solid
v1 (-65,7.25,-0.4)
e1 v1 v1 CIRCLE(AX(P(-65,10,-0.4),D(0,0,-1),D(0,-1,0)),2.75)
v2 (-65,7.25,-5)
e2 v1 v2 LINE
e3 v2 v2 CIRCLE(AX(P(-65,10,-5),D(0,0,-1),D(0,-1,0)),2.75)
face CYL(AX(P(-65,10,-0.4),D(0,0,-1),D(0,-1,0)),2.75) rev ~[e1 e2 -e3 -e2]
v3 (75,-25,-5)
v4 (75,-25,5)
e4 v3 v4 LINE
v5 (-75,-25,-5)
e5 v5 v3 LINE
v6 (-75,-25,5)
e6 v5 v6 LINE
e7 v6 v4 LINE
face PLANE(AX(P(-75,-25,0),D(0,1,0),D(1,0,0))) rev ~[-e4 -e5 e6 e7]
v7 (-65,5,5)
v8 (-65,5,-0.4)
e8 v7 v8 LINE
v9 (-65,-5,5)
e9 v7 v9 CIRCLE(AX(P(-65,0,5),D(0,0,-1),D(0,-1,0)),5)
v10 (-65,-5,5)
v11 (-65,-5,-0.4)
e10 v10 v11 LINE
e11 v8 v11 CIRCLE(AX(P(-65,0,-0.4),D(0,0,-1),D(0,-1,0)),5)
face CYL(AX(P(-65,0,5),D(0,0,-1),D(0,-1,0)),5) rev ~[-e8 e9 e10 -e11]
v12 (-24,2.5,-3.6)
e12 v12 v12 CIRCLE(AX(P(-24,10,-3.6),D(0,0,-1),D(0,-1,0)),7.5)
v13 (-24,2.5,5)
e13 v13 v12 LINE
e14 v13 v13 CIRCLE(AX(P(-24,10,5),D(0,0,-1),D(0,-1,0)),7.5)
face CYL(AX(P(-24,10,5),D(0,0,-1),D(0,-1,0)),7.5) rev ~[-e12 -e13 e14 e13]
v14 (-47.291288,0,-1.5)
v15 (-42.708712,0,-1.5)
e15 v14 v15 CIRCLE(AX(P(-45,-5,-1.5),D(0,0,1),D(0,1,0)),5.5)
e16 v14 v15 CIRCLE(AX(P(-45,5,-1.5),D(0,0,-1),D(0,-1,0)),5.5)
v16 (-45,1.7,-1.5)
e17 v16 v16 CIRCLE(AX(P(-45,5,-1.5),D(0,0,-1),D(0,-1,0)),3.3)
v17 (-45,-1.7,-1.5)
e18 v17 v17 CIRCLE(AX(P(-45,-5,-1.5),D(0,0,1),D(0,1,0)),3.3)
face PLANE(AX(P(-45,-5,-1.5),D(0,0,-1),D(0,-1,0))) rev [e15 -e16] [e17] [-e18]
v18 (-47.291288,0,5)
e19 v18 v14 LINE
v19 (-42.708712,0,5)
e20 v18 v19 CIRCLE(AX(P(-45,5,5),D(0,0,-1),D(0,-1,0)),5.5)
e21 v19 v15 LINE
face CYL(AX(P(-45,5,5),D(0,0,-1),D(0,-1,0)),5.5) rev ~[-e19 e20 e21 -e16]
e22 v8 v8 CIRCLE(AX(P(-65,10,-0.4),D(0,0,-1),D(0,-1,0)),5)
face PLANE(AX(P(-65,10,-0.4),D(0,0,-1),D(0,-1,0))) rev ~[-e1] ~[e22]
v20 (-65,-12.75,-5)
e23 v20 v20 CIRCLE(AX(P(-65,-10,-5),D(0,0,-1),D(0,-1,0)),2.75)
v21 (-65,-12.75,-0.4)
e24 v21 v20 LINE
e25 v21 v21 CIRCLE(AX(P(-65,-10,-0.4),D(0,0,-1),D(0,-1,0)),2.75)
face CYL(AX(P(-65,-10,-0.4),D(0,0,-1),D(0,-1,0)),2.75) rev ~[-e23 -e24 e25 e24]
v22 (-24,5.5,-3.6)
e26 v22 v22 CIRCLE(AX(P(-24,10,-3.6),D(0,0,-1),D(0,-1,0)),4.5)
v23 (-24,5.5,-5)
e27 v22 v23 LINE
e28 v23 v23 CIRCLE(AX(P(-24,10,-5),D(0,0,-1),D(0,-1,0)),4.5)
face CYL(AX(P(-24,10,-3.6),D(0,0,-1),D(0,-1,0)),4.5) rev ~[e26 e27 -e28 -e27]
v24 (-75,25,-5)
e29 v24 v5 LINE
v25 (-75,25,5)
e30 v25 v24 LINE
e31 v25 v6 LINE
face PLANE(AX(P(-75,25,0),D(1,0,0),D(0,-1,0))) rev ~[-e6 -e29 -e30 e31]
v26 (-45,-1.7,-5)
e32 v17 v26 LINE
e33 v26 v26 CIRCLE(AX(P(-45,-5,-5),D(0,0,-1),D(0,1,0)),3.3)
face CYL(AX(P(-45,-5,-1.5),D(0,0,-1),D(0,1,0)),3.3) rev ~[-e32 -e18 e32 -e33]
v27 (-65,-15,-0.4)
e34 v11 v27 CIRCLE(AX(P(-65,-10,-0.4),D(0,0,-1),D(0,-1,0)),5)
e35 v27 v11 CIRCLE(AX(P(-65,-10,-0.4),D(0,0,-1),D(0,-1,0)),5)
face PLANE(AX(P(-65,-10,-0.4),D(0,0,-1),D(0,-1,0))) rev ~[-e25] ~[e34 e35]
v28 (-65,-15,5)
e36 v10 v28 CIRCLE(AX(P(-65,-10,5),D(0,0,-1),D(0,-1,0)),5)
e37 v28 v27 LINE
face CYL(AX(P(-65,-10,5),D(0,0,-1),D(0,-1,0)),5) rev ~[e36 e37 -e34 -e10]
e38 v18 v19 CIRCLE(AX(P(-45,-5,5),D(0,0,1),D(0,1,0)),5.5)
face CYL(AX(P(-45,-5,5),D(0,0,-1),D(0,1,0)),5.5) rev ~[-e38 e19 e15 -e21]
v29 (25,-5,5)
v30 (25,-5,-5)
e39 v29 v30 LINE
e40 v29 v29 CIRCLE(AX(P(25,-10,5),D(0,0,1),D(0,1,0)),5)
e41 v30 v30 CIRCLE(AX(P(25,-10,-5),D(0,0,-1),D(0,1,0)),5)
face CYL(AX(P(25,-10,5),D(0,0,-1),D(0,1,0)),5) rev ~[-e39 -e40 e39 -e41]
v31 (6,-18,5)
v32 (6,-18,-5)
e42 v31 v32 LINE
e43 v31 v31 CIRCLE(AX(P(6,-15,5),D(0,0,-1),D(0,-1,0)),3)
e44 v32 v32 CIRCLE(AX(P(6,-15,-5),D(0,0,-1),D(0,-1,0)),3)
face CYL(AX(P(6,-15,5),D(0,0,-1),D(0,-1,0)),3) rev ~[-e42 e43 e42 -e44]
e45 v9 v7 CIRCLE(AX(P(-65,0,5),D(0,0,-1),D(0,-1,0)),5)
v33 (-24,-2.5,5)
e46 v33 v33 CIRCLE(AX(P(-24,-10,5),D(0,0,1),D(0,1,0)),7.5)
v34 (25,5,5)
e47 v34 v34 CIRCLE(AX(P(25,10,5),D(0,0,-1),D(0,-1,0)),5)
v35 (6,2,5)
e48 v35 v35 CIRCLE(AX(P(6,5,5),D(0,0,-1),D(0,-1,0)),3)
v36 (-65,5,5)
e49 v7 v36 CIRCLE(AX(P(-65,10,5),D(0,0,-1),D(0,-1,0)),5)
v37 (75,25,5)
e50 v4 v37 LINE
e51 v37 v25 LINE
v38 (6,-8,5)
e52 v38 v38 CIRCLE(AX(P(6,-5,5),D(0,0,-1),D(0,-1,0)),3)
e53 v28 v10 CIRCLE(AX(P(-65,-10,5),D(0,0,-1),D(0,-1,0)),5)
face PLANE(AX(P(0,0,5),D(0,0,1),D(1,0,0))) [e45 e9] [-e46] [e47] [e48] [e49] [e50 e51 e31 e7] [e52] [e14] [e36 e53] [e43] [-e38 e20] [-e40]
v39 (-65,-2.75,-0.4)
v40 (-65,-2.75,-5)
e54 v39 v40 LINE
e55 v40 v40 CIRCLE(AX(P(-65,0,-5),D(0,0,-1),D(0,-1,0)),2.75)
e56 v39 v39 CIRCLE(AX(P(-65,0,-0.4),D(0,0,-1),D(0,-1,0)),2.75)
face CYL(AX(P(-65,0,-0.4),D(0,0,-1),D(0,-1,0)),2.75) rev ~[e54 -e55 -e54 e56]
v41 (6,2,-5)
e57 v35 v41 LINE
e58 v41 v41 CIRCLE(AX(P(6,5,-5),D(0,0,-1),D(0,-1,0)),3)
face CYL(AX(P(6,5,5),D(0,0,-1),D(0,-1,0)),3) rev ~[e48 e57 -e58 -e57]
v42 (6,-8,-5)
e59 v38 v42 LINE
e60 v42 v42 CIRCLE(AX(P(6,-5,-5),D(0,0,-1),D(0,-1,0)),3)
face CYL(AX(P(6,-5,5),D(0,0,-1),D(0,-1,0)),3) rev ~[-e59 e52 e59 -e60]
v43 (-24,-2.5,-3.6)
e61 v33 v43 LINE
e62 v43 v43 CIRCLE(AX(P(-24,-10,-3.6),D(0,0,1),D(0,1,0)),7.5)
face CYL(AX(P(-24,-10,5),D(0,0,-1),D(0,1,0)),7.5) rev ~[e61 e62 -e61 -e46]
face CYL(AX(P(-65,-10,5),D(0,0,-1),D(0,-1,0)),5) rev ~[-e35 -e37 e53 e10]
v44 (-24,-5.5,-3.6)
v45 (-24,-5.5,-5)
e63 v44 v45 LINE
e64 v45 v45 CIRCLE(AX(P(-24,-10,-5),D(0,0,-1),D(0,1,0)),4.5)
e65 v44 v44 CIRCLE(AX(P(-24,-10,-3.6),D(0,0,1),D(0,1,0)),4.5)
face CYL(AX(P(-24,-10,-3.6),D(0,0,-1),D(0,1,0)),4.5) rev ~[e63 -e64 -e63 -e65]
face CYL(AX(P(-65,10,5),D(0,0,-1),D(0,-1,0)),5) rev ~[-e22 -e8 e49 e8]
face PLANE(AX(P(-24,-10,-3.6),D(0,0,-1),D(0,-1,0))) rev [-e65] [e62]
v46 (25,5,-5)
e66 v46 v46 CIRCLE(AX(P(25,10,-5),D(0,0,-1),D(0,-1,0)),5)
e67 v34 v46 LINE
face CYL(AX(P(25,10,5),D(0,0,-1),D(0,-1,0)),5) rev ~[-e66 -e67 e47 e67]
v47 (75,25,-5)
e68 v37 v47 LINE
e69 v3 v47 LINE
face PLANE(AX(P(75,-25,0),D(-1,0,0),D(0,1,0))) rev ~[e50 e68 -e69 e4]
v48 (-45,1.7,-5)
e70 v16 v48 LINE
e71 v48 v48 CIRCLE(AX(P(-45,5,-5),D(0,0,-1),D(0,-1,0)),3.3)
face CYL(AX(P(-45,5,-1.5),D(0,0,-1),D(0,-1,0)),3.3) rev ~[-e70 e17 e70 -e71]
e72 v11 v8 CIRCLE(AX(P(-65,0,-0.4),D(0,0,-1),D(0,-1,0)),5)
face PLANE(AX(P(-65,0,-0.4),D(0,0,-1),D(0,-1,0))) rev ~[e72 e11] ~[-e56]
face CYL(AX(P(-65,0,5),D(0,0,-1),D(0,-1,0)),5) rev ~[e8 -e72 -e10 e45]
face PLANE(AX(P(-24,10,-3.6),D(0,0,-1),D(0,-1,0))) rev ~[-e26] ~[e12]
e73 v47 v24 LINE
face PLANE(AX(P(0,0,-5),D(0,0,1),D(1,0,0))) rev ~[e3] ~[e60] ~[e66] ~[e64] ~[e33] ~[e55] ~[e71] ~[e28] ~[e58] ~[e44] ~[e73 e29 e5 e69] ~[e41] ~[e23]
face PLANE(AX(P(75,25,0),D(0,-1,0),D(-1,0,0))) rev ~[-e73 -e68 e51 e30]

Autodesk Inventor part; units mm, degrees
ref_plane "YZ Plane" through (0, 0, 0) normal (1, 0, 0) x (0, 1, 0)
ref_plane "XZ Plane" through (0, 0, 0) normal (0, 1, 0) x (-1, 0, 0)
ref_plane "XY Plane" through (0, 0, 0) normal (0, 0, 1) x (1, 0, 0)
sketch "Sketch2" plane through (0, 0, 0) normal (0, 0, 1) x (1, 0, 0)
  line L0 (-75, -25) -> (75, -25)
  line L1 (75, -25) -> (75, 25)
  line L2 (75, 25) -> (-75, 25)
  line L3 (-75, 25) -> (-75, -25)
  line L4 (-75, -25) -> (75, 25) construction
  line L5 (75, -25) -> (-75, 25) construction
  point P0 (0, 0)
  dimension "d1" = 150
  dimension "d2" = 50
extrude "Extrusion1" add sketch "Sketch2" along normal mid plane 10
sketch "Sketch3" plane through (0, 0, 5) normal (0, 0, 1) x (1, 0, 0)
  line L0 (-75, 25) -> (-75, -25) projected
  line L1 (75, 25) -> (-75, 25) projected
  point P0 (0, 0)
  point P1 (-65, 0)
  dimension "d40" = 10
  dimension "d43" = 25
hole "Hole1" at (-65, 0, 5) direction (0, 0, -1) diameter 5.5 depth 14.2 tip angle 118 counterbore diameter 10 counterbore depth 5.4 clearance for "Socket Head Cap Screw" size "M5" standard "TS Profile"
sketch "Sketch4" plane through (0, 0, 5) normal (0, 0, 1) x (1, 0, 0)
  line L0 (-75, 25) -> (-75, -25) projected
  line L1 (75, 25) -> (-75, 25) projected
  point P0 (0, 0)
  point P1 (-45, 5)
  dimension "d41" = 30
  dimension "d42" = 20
hole "Hole2" at (-45, 5, 5) direction (0, 0, -1) diameter 6.6 depth 17.1 tip angle 118 counterbore diameter 11 counterbore depth 6.5 clearance for "Socket Head Cap Screw" size "M6" standard "TS Profile"
sketch "Sketch5" plane through (0, 0, 5) normal (0, 0, 1) x (1, 0, 0)
  line L0 (-75, 25) -> (-75, -25) projected
  line L1 (75, 25) -> (-75, 25) projected
  point P0 (0, 0)
  point P1 (-24, 10)
  dimension "d44" = 51
  dimension "d45" = 15
hole "Hole3" at (-24, 10, 5) direction (0, 0, -1) diameter 9 depth 22.2 tip angle 118 counterbore diameter 15 counterbore depth 8.6 clearance for "Socket Head Cap Screw" size "M8" standard "TS Profile"
sketch "Sketch6" plane through (0, 0, 5) normal (0, 0, 1) x (1, 0, 0)
  line L0 (-75, 25) -> (-75, -25) projected
  line L1 (75, 25) -> (-75, 25) projected
  point P0 (0, 0)
  point P1 (6, 5)
  dimension "d46" = 81
  dimension "d47" = 20
hole "Hole4" at (6, 5, 5) direction (0, 0, -1) diameter 6 depth 14.2 tip angle 118
sketch "Sketch7" plane through (0, 0, 5) normal (0, 0, 1) x (1, 0, 0)
  line L0 (-75, 25) -> (-75, -25) projected
  line L1 (75, 25) -> (-75, 25) projected
  point P0 (0, 0)
  point P1 (25, 10)
  dimension "d48" = 100
  dimension "d49" = 15
hole "Hole5" at (25, 10, 5) direction (0, 0, -1) diameter 10 depth 14.2 tip angle 118
pattern_linear "Rectangular Pattern1" count 3 spacing 10 along (0, -1, 0) of "Hole1" first direction both ways yes
mirror "Mirror1" about plane through (0, 0, 0) normal (0, 1, 0) of "Hole2"
mirror "Mirror2" about plane through (0, 0, 0) normal (0, 1, 0) of "Hole3"
pattern_linear "Rectangular Pattern2" count 3 spacing 10 along (0, -1, 0) of "Hole4"
mirror "Mirror3" about plane through (0, 0, 0) normal (0, 1, 0) of "Hole5"
properties part number "홀간 거리 확인 파트-12" material "SS400"
